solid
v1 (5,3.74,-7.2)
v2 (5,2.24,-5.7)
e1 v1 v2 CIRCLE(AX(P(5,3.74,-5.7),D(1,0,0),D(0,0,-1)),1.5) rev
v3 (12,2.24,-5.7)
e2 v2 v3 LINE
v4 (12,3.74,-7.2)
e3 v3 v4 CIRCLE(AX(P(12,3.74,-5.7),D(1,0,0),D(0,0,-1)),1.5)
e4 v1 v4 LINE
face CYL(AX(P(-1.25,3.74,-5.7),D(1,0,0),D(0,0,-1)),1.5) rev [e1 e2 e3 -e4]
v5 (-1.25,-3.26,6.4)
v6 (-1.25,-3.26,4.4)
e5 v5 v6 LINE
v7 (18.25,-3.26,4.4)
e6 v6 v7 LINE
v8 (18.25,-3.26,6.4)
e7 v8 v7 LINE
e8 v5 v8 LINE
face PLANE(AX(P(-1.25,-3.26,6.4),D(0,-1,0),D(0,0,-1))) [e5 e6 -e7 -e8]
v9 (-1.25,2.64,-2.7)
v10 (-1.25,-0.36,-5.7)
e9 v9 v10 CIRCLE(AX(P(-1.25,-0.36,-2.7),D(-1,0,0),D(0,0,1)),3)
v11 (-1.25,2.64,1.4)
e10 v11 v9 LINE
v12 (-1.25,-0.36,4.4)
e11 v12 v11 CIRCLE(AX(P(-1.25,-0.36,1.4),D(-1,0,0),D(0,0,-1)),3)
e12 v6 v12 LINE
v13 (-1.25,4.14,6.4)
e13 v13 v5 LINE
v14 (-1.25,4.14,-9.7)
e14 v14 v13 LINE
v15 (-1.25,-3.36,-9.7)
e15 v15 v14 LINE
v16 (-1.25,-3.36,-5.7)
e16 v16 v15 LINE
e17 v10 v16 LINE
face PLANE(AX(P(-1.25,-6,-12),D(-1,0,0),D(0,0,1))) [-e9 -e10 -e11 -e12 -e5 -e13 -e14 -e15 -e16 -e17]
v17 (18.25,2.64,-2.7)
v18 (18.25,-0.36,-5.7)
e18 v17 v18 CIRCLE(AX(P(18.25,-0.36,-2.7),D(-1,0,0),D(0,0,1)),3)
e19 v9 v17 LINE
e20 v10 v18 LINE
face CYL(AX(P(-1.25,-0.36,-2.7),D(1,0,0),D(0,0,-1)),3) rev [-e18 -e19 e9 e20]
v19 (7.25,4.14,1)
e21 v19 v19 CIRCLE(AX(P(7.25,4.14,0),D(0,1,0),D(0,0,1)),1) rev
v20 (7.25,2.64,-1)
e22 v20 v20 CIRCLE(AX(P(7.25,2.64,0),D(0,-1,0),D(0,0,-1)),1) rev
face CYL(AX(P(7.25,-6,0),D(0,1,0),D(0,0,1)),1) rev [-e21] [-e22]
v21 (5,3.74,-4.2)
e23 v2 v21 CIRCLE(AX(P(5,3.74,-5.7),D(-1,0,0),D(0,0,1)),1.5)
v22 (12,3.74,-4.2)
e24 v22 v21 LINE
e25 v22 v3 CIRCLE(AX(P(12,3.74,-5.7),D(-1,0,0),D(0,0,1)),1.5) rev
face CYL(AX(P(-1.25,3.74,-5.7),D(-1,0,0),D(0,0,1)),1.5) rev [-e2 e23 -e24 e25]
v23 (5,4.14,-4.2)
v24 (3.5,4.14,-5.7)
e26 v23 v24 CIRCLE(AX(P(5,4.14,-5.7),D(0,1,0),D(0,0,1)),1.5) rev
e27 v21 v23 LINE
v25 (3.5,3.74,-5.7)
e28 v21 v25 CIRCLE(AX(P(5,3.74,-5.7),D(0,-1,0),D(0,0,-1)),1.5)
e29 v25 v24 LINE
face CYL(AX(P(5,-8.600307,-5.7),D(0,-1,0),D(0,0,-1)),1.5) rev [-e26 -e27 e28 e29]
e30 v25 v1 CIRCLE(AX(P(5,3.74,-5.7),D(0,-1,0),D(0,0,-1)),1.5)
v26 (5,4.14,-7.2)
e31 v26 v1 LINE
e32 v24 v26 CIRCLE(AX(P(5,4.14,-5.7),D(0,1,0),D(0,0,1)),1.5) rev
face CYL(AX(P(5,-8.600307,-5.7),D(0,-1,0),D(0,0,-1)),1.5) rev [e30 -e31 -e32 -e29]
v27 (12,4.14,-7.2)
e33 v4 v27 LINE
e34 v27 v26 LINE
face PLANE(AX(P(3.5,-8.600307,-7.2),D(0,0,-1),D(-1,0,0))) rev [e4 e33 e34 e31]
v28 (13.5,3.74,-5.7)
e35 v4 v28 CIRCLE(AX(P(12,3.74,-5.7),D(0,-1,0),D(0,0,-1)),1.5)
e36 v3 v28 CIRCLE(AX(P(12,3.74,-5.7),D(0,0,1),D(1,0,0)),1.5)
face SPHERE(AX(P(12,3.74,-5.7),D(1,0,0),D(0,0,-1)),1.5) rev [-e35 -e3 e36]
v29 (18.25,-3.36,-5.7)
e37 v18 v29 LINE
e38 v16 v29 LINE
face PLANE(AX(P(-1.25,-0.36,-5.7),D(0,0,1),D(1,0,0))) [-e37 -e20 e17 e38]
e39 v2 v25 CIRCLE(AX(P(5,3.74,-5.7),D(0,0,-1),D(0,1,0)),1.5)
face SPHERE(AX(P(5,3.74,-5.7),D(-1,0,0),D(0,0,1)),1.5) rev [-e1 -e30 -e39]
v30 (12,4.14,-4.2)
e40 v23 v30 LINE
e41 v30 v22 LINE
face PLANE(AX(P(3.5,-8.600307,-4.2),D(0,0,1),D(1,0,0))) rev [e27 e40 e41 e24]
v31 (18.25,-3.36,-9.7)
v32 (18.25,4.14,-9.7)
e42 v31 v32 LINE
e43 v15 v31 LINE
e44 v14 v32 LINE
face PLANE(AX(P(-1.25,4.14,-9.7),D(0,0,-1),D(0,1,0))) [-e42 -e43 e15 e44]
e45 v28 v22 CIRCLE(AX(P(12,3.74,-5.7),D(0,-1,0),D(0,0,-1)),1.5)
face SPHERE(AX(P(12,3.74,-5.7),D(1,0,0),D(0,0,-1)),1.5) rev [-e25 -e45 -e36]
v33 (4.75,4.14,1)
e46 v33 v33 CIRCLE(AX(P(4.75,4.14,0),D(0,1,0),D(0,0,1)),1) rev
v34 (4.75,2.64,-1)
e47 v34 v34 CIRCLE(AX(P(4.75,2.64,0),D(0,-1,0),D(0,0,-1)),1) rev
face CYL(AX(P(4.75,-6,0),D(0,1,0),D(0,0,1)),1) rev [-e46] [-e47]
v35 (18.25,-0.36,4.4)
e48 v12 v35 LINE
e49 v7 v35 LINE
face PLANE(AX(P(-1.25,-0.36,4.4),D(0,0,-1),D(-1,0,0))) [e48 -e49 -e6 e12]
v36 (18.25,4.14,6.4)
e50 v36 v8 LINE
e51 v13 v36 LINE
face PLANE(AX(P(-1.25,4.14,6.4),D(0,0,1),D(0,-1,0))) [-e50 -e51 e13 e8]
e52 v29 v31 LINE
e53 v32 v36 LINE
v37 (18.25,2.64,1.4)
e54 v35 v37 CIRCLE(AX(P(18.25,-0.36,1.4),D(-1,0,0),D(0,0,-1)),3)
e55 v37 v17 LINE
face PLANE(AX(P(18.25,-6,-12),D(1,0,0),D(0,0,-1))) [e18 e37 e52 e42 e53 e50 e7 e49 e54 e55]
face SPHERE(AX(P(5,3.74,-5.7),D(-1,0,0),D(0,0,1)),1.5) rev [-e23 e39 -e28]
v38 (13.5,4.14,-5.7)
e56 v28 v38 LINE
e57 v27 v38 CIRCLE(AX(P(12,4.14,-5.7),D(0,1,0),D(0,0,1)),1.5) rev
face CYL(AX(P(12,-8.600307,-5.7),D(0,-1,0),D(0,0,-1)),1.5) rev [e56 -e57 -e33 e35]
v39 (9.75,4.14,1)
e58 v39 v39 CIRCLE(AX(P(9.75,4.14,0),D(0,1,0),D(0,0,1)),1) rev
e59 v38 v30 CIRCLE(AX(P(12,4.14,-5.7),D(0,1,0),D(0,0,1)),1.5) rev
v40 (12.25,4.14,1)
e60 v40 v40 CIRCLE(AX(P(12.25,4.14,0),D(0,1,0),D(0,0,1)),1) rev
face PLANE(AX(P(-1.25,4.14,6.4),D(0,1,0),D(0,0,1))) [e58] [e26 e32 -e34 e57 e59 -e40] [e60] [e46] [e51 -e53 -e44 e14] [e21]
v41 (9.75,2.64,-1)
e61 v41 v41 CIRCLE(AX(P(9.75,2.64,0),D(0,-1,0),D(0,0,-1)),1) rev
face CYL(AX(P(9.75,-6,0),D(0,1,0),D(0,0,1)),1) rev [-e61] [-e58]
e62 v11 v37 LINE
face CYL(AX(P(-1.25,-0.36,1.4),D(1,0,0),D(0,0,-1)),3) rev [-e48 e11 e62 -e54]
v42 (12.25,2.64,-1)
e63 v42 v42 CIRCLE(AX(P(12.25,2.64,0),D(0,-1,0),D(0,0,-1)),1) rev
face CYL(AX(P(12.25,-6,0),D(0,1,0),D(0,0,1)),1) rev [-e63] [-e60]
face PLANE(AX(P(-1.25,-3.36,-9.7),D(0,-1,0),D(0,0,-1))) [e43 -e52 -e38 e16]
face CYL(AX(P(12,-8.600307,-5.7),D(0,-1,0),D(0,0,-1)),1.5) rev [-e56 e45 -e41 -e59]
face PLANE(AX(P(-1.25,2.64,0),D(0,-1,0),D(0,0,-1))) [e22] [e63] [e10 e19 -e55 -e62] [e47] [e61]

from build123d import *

# Parameters (mm, degrees)
BOSS_EXTRUDE1_DEPTH      = 4.44
BOSS_EXTRUDE1_DEPTH_BACK = 6
SKETCH21_W               = 19.5
SKETCH21_H               = 24
CUT_EXTRUDE2_DEPTH       = 24.71192527
CUT_EXTRUDE2_DEPTH_BACK  = 24.71192527
SKETCH14_R               = 1
CUT_EXTRUDE4_DEPTH       = 23.650882985
CUT_EXTRUDE4_DEPTH_BACK  = 23.650882985
SKETCH20_W               = 31.709739698
SKETCH20_H               = 13.674781638
SKETCH23_W               = 10
SKETCH23_H               = 3
CUT_EXTRUDE5_DEPTH       = 1.9
FILLET1_R                = 1.5
FILLET2_R                = 1.5


with BuildPart() as part:
    # Sketch21 → Boss-Extrude1 (new, two sides: drawn at the far end of the back side and taken through both)
    with BuildSketch(Plane(origin=(0, 0, 0), x_dir=(1, 0, 0), z_dir=(0, 1, 0)).offset(-BOSS_EXTRUDE1_DEPTH_BACK)):
        with Locations((8.5, 0)):
            Rectangle(SKETCH21_W, SKETCH21_H)
    extrude(amount=BOSS_EXTRUDE1_DEPTH + BOSS_EXTRUDE1_DEPTH_BACK)

    # Sketch14 → Cut-Extrude2 (cut, two sides: drawn at the far end of the back side and taken through both)
    with BuildSketch(Plane(origin=(0, 3.23, 0), x_dir=(1, 0, 0), z_dir=(0, 1, 0)).offset(-CUT_EXTRUDE2_DEPTH_BACK)):
        with Locations(Location((4.75, 0, 0), (0, 0, 270))):
            Circle(SKETCH14_R)
        with Locations(Location((7.25, 0, 0), (0, 0, 270))):
            Circle(SKETCH14_R)
        with Locations(Location((9.75, 0, 0), (0, 0, 270))):
            Circle(SKETCH14_R)
        with Locations(Location((12.25, 0, 0), (0, 0, 270))):
            Circle(SKETCH14_R)
    extrude(amount=CUT_EXTRUDE2_DEPTH + CUT_EXTRUDE2_DEPTH_BACK, mode=Mode.SUBTRACT)

    # Sketch20 → Cut-Extrude4 (cut, two sides: drawn at the far end of the back side and taken through both)
    with BuildSketch(Plane(origin=(0, 0, 0), x_dir=(0, 0, -1), z_dir=(1, 0, 0)).offset(-CUT_EXTRUDE4_DEPTH_BACK)):
        with Locations((-0.27698472, -0.290016026)):
            Rectangle(SKETCH20_W, SKETCH20_H)
        with BuildLine():
            Line((-4.4, -0.36), (-4.4, -3.26))
            Line((-4.4, -3.26), (-6.4, -3.26))
            Line((-6.4, -3.26), (-6.4, 4.14))
            Line((-6.4, 4.14), (9.7, 4.14))
            Line((9.7, 4.14), (9.7, -3.36))
            Line((9.7, -3.36), (5.7, -3.36))
            Line((5.7, -3.36), (5.7, -0.36))
            ThreePointArc((5.7, -0.36), (4.821320344, 1.761320344), (2.7, 2.64))
            Line((2.7, 2.64), (0, 2.64))
            Line((0, 2.64), (-1.4, 2.64))
            ThreePointArc((-1.4, 2.64), (-3.521320344, 1.761320344), (-4.4, -0.36))
        make_face(mode=Mode.SUBTRACT)
    extrude(amount=CUT_EXTRUDE4_DEPTH + CUT_EXTRUDE4_DEPTH_BACK, mode=Mode.SUBTRACT)

    # Sketch23 → Cut-Extrude5 (cut)
    with BuildSketch(Plane(origin=(0, 4.14, 0), x_dir=(1, 0, 0), z_dir=(0, 1, 0))):
        with Locations((8.5, 5.7)):
            Rectangle(SKETCH23_W, SKETCH23_H)
    extrude(amount=-CUT_EXTRUDE5_DEPTH, mode=Mode.SUBTRACT)

    # Fillet1
    fillet1_edges = [part.edges().sort_by_distance(p)[0] for p in [
        (8.5, 2.24, -7.2),
        (8.5, 2.24, -4.2),
    ]]
    fillet(fillet1_edges, radius=FILLET1_R - 0.0001)  # a hair under: the kernel refuses the full size

    # Fillet2
    fillet2_edges = [part.edges().sort_by_distance(p)[0] for p in [
        (3.5, 3.93995, -4.2),
        (3.5, 3.93995, -7.2),
        (3.5, 2.679310539, -6.760689461),
        (13.5, 3.93995, -7.2),
        (13.5, 3.93995, -4.2),
        (13.5, 2.679310539, -4.639310539),
        (3.5, 2.679310539, -4.639310539),
        (13.5, 2.679310539, -6.760689461),
    ]]
    fillet(fillet2_edges, radius=FILLET2_R - 0.0001)  # a hair under: the kernel refuses the full size


solid = part.part
